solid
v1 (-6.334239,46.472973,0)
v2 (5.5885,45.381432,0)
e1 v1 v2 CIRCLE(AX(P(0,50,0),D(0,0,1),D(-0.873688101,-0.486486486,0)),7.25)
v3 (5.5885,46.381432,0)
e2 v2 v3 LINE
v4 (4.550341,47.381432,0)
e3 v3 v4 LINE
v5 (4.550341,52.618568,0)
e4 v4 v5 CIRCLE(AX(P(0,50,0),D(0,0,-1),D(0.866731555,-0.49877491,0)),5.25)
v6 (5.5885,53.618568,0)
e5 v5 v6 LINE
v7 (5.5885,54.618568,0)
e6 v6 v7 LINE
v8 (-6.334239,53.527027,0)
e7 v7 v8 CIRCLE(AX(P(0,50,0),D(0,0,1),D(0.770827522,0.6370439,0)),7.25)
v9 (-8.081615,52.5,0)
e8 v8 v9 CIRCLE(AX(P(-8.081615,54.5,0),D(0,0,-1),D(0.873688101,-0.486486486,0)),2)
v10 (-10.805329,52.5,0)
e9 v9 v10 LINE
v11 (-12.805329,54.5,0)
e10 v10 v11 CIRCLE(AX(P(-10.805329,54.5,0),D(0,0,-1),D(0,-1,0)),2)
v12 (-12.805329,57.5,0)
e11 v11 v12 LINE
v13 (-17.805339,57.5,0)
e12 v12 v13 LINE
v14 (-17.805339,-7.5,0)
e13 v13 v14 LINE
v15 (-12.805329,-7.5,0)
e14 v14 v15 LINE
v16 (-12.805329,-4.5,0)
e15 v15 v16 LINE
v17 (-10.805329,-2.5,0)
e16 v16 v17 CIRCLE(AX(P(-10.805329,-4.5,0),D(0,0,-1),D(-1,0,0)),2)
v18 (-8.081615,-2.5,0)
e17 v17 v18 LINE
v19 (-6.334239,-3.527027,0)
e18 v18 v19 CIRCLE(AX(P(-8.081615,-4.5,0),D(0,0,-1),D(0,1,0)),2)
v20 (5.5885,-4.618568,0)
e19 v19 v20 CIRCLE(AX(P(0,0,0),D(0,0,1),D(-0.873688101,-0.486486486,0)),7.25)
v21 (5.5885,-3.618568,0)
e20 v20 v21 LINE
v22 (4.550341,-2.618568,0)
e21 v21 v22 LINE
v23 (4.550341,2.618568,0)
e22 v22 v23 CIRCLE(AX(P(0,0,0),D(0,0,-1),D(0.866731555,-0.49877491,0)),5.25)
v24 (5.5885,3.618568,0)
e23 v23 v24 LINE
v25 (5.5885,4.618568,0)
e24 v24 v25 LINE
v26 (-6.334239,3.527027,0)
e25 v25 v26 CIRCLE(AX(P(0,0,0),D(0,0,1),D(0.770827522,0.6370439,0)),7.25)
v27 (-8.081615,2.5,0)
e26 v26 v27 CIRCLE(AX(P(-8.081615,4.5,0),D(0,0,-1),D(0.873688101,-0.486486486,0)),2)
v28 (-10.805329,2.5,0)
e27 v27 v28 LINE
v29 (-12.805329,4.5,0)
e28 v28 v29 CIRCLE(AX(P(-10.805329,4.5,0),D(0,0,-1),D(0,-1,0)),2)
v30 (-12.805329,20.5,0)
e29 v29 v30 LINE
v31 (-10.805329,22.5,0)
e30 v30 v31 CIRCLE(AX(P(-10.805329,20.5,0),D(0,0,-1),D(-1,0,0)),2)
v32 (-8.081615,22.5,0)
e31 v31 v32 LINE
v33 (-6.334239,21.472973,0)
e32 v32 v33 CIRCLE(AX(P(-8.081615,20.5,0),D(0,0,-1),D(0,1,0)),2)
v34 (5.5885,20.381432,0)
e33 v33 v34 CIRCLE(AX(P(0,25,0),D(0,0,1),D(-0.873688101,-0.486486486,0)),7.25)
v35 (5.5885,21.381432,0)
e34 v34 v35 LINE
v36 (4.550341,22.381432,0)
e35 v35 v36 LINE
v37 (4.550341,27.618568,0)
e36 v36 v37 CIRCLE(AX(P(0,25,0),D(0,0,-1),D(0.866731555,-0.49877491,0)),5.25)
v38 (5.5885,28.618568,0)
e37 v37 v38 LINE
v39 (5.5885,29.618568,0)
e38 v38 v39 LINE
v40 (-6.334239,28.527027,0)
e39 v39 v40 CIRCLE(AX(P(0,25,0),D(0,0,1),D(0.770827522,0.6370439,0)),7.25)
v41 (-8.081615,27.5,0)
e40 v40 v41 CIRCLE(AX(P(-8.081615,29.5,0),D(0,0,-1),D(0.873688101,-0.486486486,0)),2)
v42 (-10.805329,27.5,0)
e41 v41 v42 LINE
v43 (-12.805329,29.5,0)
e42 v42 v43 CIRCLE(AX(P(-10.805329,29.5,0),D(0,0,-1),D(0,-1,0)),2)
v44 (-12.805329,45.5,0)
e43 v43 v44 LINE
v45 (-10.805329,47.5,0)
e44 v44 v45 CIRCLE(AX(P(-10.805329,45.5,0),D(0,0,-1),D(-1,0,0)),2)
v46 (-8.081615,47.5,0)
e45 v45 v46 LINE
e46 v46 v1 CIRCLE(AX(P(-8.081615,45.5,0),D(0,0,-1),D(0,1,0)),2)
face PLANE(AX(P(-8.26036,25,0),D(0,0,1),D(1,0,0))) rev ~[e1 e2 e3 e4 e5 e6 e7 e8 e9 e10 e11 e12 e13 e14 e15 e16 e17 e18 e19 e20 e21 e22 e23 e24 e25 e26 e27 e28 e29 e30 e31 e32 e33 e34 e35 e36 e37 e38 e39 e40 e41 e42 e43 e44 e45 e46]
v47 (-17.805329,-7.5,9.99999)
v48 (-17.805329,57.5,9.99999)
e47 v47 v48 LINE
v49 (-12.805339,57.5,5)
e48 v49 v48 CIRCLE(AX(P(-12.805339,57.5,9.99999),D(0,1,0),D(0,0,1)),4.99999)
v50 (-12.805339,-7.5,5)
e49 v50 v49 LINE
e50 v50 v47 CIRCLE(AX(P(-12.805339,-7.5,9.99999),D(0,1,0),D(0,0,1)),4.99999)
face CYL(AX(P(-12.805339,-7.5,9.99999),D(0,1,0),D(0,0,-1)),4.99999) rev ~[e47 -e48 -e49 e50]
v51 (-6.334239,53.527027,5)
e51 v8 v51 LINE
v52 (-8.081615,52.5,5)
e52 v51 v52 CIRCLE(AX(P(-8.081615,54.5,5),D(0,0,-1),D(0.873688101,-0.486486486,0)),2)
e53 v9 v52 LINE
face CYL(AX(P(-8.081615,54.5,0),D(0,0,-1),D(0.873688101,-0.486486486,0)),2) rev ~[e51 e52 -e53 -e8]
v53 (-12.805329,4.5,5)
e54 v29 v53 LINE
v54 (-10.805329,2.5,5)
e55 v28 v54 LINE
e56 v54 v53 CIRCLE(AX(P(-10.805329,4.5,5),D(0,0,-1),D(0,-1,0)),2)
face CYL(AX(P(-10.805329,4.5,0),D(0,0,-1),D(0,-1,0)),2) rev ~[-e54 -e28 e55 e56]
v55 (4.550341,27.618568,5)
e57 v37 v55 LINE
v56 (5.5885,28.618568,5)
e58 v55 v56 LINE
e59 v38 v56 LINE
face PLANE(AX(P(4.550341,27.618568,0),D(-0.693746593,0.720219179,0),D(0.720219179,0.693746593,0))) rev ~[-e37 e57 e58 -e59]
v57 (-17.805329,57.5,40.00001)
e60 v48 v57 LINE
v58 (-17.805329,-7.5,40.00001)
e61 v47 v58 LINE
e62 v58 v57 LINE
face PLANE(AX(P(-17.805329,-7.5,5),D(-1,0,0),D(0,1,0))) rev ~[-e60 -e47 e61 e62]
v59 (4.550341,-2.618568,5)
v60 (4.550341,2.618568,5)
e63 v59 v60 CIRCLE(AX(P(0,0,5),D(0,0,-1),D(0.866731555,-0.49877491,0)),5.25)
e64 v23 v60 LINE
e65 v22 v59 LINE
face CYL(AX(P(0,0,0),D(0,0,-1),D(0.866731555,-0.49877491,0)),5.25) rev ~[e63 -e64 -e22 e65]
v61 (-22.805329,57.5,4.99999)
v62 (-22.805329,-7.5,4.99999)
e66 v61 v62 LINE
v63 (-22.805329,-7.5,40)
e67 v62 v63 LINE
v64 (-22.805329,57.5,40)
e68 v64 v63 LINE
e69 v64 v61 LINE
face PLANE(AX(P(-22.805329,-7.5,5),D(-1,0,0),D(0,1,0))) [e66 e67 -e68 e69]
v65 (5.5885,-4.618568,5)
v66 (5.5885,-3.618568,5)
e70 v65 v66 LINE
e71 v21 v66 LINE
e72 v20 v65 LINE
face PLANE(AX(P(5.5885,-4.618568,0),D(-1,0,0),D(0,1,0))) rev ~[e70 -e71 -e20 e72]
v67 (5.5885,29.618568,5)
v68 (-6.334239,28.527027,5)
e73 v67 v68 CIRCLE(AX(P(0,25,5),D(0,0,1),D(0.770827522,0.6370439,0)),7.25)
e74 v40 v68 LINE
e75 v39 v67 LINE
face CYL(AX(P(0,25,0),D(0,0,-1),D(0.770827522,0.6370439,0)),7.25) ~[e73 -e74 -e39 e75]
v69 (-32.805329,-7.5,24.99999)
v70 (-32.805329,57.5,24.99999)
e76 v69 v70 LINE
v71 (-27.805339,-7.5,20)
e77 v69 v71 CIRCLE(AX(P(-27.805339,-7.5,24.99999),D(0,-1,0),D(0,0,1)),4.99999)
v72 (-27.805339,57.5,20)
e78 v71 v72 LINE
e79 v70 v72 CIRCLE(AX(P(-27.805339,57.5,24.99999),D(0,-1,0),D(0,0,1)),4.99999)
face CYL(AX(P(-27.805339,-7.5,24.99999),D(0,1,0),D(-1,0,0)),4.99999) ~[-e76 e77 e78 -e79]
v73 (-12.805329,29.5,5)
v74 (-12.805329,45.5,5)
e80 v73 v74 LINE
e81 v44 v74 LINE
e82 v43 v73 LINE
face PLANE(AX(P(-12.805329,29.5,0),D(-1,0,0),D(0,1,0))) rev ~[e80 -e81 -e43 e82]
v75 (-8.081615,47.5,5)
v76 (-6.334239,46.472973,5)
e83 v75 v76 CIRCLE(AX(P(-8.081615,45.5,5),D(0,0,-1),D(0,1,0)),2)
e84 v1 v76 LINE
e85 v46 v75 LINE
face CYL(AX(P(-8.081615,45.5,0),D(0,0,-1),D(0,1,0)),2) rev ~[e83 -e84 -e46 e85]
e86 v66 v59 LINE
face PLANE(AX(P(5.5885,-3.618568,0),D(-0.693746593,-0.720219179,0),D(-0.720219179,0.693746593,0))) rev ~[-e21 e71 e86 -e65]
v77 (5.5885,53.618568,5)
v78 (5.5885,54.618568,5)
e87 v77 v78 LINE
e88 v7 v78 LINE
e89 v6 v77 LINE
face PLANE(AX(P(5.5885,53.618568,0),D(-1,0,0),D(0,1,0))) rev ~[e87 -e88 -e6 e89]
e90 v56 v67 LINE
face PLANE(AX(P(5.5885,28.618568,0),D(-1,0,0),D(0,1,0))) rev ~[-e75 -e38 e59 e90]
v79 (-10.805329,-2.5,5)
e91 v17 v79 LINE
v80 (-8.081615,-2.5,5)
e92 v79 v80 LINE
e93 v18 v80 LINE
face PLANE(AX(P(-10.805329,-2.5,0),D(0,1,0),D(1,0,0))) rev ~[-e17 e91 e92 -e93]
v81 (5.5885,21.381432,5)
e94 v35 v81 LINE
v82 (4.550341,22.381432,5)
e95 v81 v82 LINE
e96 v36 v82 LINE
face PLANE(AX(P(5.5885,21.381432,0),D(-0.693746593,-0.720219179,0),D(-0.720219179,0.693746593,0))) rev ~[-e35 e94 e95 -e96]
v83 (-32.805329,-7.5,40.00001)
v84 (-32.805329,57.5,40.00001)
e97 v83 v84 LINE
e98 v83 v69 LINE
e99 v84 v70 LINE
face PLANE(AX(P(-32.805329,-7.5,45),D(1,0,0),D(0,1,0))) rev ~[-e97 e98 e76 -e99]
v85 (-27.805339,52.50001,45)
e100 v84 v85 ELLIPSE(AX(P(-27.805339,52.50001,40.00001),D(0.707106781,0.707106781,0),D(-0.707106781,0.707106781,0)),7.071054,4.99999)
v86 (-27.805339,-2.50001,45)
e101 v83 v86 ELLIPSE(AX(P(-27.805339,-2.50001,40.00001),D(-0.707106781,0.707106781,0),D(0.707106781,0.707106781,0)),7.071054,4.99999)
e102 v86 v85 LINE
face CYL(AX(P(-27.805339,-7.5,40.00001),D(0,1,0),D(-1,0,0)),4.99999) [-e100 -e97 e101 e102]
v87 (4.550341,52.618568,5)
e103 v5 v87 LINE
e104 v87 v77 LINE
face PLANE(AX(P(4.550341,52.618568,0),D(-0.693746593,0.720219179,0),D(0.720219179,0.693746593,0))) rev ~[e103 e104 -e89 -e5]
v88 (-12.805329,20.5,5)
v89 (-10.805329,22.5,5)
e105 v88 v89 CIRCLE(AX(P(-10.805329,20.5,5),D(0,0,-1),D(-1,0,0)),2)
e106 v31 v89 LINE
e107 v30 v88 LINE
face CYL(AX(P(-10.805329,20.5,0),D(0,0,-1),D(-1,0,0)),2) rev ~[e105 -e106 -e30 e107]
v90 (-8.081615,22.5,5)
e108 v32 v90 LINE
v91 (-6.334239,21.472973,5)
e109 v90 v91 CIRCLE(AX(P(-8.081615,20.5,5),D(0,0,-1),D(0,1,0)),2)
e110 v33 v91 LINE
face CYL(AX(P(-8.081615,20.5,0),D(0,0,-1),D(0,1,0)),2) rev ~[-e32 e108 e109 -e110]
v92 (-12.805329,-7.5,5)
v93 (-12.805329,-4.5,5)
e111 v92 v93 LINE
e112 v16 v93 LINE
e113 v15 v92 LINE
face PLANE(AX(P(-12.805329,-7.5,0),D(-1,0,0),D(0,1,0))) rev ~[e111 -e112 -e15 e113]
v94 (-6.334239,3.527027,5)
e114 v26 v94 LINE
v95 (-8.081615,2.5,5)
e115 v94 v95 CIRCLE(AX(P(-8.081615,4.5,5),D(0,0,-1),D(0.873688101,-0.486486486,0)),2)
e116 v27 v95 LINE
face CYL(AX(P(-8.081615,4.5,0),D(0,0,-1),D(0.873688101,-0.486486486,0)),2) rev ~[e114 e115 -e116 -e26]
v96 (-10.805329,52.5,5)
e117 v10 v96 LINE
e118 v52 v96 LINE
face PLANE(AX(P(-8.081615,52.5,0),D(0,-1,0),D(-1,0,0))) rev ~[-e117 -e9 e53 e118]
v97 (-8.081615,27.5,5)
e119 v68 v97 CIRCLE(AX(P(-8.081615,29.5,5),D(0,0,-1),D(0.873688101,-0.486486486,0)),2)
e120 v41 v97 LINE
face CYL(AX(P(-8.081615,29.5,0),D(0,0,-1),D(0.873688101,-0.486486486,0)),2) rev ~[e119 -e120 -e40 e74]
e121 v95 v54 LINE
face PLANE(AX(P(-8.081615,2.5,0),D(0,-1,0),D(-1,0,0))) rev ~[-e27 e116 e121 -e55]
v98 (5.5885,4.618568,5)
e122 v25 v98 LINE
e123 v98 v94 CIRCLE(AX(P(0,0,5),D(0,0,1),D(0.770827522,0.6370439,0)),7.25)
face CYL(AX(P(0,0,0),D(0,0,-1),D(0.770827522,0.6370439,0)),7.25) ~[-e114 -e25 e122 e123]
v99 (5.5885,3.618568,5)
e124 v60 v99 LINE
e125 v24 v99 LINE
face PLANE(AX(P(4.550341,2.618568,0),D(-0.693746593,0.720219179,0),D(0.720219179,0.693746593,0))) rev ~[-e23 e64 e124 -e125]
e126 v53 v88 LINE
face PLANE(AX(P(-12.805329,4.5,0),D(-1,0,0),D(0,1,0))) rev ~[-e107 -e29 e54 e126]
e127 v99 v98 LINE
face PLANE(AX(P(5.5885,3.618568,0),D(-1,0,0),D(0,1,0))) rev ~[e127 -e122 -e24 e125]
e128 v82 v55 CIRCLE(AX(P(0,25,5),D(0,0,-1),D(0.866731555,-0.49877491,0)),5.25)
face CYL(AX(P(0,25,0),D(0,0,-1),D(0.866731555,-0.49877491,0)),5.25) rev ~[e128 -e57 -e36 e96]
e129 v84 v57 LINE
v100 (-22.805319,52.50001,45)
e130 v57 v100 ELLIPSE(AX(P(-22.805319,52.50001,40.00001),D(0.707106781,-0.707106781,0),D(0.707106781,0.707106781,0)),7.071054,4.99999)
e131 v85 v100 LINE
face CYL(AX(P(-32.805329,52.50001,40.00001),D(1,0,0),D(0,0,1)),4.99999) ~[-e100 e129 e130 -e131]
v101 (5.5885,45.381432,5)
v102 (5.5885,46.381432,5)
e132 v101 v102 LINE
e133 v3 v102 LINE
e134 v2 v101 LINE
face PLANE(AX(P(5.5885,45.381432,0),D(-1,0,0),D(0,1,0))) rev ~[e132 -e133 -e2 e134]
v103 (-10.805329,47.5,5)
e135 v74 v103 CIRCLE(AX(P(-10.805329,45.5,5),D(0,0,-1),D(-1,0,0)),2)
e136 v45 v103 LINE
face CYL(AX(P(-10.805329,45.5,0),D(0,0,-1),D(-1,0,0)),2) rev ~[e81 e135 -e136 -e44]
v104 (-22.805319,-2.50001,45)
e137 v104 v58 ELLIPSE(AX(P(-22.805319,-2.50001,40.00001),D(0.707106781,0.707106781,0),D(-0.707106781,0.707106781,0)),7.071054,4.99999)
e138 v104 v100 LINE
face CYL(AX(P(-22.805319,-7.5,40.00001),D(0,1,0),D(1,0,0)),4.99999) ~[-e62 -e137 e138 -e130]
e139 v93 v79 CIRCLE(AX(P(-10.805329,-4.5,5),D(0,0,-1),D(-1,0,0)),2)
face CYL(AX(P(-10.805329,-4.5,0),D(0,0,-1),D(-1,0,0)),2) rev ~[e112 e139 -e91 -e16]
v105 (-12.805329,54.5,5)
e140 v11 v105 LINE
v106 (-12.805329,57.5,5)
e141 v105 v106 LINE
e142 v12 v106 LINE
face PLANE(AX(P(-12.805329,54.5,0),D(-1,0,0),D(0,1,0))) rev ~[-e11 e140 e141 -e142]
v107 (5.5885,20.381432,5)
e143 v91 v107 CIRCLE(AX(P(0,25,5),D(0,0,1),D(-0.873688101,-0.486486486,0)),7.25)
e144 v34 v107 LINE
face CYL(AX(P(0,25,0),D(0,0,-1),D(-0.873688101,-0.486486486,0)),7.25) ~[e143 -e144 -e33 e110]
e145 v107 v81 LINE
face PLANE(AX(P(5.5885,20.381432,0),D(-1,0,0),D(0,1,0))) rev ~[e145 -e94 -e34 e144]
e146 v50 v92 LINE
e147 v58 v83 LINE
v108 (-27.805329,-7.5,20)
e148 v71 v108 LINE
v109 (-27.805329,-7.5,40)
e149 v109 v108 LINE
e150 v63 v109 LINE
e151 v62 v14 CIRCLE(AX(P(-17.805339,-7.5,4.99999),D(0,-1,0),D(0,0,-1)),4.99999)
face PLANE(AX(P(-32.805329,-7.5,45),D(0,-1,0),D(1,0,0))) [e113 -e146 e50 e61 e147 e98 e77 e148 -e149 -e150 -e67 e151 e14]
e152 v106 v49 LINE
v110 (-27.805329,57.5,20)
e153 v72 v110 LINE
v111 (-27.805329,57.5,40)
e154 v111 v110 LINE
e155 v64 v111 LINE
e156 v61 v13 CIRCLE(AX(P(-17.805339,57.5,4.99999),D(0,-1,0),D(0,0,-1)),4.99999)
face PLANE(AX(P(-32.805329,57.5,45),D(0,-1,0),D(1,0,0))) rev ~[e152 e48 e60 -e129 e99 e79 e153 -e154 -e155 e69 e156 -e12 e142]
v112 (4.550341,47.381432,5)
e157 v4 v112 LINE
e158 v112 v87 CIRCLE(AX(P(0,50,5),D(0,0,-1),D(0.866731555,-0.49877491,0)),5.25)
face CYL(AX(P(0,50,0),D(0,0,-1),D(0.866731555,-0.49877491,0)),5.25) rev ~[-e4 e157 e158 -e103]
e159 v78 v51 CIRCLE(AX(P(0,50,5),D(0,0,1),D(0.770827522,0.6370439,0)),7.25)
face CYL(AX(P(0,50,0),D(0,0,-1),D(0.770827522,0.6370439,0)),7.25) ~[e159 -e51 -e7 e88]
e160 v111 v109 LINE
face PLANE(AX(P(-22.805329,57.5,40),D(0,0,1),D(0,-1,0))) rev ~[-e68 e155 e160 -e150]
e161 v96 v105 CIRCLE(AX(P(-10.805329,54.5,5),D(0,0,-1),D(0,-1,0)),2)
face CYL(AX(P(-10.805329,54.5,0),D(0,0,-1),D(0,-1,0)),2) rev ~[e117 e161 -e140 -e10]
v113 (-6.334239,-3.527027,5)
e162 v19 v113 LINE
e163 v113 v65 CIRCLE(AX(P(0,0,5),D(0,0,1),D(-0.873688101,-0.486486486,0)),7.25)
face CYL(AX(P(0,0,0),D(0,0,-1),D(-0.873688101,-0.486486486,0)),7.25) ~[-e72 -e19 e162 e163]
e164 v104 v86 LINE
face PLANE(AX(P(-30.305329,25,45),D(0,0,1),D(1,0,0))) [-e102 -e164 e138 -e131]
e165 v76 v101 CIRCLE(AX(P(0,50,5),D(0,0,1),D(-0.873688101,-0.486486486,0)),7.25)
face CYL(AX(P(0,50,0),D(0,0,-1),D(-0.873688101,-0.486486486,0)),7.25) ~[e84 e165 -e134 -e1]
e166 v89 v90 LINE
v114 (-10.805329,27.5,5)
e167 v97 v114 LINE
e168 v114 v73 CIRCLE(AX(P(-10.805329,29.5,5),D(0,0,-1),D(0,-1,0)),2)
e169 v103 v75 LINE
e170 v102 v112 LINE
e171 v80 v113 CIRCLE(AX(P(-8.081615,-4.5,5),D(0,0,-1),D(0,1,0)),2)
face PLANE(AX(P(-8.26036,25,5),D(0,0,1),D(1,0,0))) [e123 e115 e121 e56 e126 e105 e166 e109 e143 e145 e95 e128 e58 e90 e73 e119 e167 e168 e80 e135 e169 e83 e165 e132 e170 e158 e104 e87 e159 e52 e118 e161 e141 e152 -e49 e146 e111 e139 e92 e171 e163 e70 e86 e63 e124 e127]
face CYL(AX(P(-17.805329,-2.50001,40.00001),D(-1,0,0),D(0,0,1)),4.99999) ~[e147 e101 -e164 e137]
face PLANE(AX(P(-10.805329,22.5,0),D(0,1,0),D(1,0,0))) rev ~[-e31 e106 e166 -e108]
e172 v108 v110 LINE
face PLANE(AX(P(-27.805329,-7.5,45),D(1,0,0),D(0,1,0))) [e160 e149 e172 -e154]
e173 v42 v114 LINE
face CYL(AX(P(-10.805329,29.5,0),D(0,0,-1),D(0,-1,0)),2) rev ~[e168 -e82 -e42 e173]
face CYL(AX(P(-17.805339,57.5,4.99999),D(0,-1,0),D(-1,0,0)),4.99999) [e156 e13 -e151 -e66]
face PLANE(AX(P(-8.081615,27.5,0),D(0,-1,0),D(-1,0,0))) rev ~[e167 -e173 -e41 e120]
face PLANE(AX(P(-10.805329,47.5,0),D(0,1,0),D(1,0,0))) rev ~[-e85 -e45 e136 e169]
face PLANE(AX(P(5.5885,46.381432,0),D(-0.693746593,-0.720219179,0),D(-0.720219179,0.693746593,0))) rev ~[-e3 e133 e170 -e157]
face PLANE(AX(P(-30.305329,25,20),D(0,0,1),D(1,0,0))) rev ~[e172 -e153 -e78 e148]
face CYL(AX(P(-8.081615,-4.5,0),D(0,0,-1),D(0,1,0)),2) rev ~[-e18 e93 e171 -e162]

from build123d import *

# Parameters (mm, degrees)
F1_DEPTH = 5
F2_W     = 5
F2_H     = 65
F3_DEPTH = 40
F4_W     = 65
F4_H     = 5
F5_DEPTH = 5
F6_W     = 5
F6_H     = 65
F7_DEPTH = 25
F8_R     = 4.99999


# Not quite as in the source:
# - a fillet or chamfer is up to 0.001 mm smaller than in the source, because OpenCascade refuses the exact size


with BuildPart() as f1:
    # F0 (on Top) → F1 (new body)
    with BuildSketch(Plane.XY):
        with BuildLine():
            ThreePointArc((4.5503406659, -2.6185682776), (-5.25, 0), (4.5503406659, 2.6185682776))
            Line((4.5503406659, 2.6185682776), (5.5884995361, 3.6185682776))
            Line((5.5884995361, 3.6185682776), (5.5884995361, 4.6185682776))
            ThreePointArc((5.5884995361, 4.6185682776), (-0.6609820827, 7.2198062776), (-6.3342387349, 3.527027027))
            ThreePointArc((-6.3342387349, 3.527027027), (-7.0681915182, 2.7757688748), (-8.0816149376, 2.5))
            Line((-8.0816149376, 2.5), (-10.8053287944, 2.5))
            ThreePointArc((-10.8053287944, 2.5), (-12.2195423568, 3.0857864376), (-12.8053287944, 4.5))
            Line((-12.8053287944, 4.5), (-12.8053287944, 20.5))
            ThreePointArc((-12.8053287944, 20.5), (-12.2195423568, 21.9142135624), (-10.8053287944, 22.5))
            Line((-10.8053287944, 22.5), (-8.0816149376, 22.5))
            ThreePointArc((-8.0816149376, 22.5), (-7.0681915182, 22.2242311252), (-6.3342387349, 21.472972973))
            ThreePointArc((-6.3342387349, 21.472972973), (-0.6609820827, 17.7801937224), (5.5884995361, 20.3814317224))
            Line((5.5884995361, 20.3814317224), (5.5884995361, 21.3814317224))
            Line((5.5884995361, 21.3814317224), (4.5503406659, 22.3814317224))
            ThreePointArc((4.5503406659, 22.3814317224), (-5.25, 25), (4.5503406659, 27.6185682776))
            Line((4.5503406659, 27.6185682776), (5.5884995361, 28.6185682776))
            Line((5.5884995361, 28.6185682776), (5.5884995361, 29.6185682776))
            ThreePointArc((5.5884995361, 29.6185682776), (-0.6609820827, 32.2198062776), (-6.3342387349, 28.527027027))
            ThreePointArc((-6.3342387349, 28.527027027), (-7.0681915182, 27.7757688748), (-8.0816149376, 27.5))
            Line((-8.0816149376, 27.5), (-10.8053287944, 27.5))
            ThreePointArc((-10.8053287944, 27.5), (-12.2195423568, 28.0857864376), (-12.8053287944, 29.5))
            Line((-12.8053287944, 29.5), (-12.8053287944, 45.5))
            ThreePointArc((-12.8053287944, 45.5), (-12.2195423568, 46.9142135624), (-10.8053287944, 47.5))
            Line((-10.8053287944, 47.5), (-8.0816149376, 47.5))
            ThreePointArc((-8.0816149376, 47.5), (-7.0681915182, 47.2242311252), (-6.3342387349, 46.472972973))
            ThreePointArc((-6.3342387349, 46.472972973), (-0.6609820827, 42.7801937224), (5.5884995361, 45.3814317224))
            Line((5.5884995361, 45.3814317224), (5.5884995361, 46.3814317224))
            Line((5.5884995361, 46.3814317224), (4.5503406659, 47.3814317224))
            ThreePointArc((4.5503406659, 47.3814317224), (-5.25, 50), (4.5503406659, 52.6185682776))
            Line((4.5503406659, 52.6185682776), (5.5884995361, 53.6185682776))
            Line((5.5884995361, 53.6185682776), (5.5884995361, 54.6185682776))
            ThreePointArc((5.5884995361, 54.6185682776), (-0.6609820827, 57.2198062776), (-6.3342387349, 53.527027027))
            ThreePointArc((-6.3342387349, 53.527027027), (-7.0681915182, 52.7757688748), (-8.0816149376, 52.5))
            Line((-8.0816149376, 52.5), (-10.8053287944, 52.5))
            ThreePointArc((-10.8053287944, 52.5), (-12.2195423568, 53.0857864376), (-12.8053287944, 54.5))
            Line((-12.8053287944, 54.5), (-12.8053287944, 57.5))
            Line((-12.8053287944, 57.5), (-22.8053287944, 57.5))
            Line((-22.8053287944, 57.5), (-22.8053287944, -7.5))
            Line((-22.8053287944, -7.5), (-12.8053287944, -7.5))
            Line((-12.8053287944, -7.5), (-12.8053287944, -4.5))
            ThreePointArc((-12.8053287944, -4.5), (-12.2195423568, -3.0857864376), (-10.8053287944, -2.5))
            Line((-10.8053287944, -2.5), (-8.0816149376, -2.5))
            ThreePointArc((-8.0816149376, -2.5), (-7.0681915182, -2.7757688748), (-6.3342387349, -3.527027027))
            ThreePointArc((-6.3342387349, -3.527027027), (-0.6609820827, -7.2198062776), (5.5884995361, -4.6185682776))
            Line((5.5884995361, -4.6185682776), (5.5884995361, -3.6185682776))
            Line((5.5884995361, -3.6185682776), (4.5503406659, -2.6185682776))
        make_face()
    extrude(amount=F1_DEPTH)

    # F2 (on face) → F3 (join)
    with BuildSketch(Plane.XY.offset(5)):
        with Locations((-20.3053287944, 25)):
            Rectangle(F2_W, F2_H)
    extrude(amount=F3_DEPTH)

    # F4 (on face) → F5 (join)
    with BuildSketch(Plane(origin=(-22.8053287944, 0, 0), x_dir=(0, -1, 0), z_dir=(-1, 0, 0))):
        with Locations((-25, 42.5)):
            Rectangle(F4_W, F4_H)
    extrude(amount=F5_DEPTH)

    # F6 (on face) → F7 (join)
    with BuildSketch(Plane.XY.offset(45)):
        with Locations((-30.3053287944, 25)):
            Rectangle(F6_W, F6_H)
    extrude(amount=-F7_DEPTH)

    # F8 (radius 5 in the source; OpenCascade refuses exactly that, so slightly less here)
    f8_edges = [f1.edges().sort_by_distance(p)[0] for p in [
        (-32.805329, 25, 45),
        (-25.305329, -7.5, 45),
        (-17.805329, 25, 45),
        (-25.305329, 57.5, 45),
        (-17.805329, 25, 5),
        (-22.805329, 25, 0),
        (-32.805329, 25, 20),
    ]]
    fillet(f8_edges, radius=F8_R)


solid = f1.part
